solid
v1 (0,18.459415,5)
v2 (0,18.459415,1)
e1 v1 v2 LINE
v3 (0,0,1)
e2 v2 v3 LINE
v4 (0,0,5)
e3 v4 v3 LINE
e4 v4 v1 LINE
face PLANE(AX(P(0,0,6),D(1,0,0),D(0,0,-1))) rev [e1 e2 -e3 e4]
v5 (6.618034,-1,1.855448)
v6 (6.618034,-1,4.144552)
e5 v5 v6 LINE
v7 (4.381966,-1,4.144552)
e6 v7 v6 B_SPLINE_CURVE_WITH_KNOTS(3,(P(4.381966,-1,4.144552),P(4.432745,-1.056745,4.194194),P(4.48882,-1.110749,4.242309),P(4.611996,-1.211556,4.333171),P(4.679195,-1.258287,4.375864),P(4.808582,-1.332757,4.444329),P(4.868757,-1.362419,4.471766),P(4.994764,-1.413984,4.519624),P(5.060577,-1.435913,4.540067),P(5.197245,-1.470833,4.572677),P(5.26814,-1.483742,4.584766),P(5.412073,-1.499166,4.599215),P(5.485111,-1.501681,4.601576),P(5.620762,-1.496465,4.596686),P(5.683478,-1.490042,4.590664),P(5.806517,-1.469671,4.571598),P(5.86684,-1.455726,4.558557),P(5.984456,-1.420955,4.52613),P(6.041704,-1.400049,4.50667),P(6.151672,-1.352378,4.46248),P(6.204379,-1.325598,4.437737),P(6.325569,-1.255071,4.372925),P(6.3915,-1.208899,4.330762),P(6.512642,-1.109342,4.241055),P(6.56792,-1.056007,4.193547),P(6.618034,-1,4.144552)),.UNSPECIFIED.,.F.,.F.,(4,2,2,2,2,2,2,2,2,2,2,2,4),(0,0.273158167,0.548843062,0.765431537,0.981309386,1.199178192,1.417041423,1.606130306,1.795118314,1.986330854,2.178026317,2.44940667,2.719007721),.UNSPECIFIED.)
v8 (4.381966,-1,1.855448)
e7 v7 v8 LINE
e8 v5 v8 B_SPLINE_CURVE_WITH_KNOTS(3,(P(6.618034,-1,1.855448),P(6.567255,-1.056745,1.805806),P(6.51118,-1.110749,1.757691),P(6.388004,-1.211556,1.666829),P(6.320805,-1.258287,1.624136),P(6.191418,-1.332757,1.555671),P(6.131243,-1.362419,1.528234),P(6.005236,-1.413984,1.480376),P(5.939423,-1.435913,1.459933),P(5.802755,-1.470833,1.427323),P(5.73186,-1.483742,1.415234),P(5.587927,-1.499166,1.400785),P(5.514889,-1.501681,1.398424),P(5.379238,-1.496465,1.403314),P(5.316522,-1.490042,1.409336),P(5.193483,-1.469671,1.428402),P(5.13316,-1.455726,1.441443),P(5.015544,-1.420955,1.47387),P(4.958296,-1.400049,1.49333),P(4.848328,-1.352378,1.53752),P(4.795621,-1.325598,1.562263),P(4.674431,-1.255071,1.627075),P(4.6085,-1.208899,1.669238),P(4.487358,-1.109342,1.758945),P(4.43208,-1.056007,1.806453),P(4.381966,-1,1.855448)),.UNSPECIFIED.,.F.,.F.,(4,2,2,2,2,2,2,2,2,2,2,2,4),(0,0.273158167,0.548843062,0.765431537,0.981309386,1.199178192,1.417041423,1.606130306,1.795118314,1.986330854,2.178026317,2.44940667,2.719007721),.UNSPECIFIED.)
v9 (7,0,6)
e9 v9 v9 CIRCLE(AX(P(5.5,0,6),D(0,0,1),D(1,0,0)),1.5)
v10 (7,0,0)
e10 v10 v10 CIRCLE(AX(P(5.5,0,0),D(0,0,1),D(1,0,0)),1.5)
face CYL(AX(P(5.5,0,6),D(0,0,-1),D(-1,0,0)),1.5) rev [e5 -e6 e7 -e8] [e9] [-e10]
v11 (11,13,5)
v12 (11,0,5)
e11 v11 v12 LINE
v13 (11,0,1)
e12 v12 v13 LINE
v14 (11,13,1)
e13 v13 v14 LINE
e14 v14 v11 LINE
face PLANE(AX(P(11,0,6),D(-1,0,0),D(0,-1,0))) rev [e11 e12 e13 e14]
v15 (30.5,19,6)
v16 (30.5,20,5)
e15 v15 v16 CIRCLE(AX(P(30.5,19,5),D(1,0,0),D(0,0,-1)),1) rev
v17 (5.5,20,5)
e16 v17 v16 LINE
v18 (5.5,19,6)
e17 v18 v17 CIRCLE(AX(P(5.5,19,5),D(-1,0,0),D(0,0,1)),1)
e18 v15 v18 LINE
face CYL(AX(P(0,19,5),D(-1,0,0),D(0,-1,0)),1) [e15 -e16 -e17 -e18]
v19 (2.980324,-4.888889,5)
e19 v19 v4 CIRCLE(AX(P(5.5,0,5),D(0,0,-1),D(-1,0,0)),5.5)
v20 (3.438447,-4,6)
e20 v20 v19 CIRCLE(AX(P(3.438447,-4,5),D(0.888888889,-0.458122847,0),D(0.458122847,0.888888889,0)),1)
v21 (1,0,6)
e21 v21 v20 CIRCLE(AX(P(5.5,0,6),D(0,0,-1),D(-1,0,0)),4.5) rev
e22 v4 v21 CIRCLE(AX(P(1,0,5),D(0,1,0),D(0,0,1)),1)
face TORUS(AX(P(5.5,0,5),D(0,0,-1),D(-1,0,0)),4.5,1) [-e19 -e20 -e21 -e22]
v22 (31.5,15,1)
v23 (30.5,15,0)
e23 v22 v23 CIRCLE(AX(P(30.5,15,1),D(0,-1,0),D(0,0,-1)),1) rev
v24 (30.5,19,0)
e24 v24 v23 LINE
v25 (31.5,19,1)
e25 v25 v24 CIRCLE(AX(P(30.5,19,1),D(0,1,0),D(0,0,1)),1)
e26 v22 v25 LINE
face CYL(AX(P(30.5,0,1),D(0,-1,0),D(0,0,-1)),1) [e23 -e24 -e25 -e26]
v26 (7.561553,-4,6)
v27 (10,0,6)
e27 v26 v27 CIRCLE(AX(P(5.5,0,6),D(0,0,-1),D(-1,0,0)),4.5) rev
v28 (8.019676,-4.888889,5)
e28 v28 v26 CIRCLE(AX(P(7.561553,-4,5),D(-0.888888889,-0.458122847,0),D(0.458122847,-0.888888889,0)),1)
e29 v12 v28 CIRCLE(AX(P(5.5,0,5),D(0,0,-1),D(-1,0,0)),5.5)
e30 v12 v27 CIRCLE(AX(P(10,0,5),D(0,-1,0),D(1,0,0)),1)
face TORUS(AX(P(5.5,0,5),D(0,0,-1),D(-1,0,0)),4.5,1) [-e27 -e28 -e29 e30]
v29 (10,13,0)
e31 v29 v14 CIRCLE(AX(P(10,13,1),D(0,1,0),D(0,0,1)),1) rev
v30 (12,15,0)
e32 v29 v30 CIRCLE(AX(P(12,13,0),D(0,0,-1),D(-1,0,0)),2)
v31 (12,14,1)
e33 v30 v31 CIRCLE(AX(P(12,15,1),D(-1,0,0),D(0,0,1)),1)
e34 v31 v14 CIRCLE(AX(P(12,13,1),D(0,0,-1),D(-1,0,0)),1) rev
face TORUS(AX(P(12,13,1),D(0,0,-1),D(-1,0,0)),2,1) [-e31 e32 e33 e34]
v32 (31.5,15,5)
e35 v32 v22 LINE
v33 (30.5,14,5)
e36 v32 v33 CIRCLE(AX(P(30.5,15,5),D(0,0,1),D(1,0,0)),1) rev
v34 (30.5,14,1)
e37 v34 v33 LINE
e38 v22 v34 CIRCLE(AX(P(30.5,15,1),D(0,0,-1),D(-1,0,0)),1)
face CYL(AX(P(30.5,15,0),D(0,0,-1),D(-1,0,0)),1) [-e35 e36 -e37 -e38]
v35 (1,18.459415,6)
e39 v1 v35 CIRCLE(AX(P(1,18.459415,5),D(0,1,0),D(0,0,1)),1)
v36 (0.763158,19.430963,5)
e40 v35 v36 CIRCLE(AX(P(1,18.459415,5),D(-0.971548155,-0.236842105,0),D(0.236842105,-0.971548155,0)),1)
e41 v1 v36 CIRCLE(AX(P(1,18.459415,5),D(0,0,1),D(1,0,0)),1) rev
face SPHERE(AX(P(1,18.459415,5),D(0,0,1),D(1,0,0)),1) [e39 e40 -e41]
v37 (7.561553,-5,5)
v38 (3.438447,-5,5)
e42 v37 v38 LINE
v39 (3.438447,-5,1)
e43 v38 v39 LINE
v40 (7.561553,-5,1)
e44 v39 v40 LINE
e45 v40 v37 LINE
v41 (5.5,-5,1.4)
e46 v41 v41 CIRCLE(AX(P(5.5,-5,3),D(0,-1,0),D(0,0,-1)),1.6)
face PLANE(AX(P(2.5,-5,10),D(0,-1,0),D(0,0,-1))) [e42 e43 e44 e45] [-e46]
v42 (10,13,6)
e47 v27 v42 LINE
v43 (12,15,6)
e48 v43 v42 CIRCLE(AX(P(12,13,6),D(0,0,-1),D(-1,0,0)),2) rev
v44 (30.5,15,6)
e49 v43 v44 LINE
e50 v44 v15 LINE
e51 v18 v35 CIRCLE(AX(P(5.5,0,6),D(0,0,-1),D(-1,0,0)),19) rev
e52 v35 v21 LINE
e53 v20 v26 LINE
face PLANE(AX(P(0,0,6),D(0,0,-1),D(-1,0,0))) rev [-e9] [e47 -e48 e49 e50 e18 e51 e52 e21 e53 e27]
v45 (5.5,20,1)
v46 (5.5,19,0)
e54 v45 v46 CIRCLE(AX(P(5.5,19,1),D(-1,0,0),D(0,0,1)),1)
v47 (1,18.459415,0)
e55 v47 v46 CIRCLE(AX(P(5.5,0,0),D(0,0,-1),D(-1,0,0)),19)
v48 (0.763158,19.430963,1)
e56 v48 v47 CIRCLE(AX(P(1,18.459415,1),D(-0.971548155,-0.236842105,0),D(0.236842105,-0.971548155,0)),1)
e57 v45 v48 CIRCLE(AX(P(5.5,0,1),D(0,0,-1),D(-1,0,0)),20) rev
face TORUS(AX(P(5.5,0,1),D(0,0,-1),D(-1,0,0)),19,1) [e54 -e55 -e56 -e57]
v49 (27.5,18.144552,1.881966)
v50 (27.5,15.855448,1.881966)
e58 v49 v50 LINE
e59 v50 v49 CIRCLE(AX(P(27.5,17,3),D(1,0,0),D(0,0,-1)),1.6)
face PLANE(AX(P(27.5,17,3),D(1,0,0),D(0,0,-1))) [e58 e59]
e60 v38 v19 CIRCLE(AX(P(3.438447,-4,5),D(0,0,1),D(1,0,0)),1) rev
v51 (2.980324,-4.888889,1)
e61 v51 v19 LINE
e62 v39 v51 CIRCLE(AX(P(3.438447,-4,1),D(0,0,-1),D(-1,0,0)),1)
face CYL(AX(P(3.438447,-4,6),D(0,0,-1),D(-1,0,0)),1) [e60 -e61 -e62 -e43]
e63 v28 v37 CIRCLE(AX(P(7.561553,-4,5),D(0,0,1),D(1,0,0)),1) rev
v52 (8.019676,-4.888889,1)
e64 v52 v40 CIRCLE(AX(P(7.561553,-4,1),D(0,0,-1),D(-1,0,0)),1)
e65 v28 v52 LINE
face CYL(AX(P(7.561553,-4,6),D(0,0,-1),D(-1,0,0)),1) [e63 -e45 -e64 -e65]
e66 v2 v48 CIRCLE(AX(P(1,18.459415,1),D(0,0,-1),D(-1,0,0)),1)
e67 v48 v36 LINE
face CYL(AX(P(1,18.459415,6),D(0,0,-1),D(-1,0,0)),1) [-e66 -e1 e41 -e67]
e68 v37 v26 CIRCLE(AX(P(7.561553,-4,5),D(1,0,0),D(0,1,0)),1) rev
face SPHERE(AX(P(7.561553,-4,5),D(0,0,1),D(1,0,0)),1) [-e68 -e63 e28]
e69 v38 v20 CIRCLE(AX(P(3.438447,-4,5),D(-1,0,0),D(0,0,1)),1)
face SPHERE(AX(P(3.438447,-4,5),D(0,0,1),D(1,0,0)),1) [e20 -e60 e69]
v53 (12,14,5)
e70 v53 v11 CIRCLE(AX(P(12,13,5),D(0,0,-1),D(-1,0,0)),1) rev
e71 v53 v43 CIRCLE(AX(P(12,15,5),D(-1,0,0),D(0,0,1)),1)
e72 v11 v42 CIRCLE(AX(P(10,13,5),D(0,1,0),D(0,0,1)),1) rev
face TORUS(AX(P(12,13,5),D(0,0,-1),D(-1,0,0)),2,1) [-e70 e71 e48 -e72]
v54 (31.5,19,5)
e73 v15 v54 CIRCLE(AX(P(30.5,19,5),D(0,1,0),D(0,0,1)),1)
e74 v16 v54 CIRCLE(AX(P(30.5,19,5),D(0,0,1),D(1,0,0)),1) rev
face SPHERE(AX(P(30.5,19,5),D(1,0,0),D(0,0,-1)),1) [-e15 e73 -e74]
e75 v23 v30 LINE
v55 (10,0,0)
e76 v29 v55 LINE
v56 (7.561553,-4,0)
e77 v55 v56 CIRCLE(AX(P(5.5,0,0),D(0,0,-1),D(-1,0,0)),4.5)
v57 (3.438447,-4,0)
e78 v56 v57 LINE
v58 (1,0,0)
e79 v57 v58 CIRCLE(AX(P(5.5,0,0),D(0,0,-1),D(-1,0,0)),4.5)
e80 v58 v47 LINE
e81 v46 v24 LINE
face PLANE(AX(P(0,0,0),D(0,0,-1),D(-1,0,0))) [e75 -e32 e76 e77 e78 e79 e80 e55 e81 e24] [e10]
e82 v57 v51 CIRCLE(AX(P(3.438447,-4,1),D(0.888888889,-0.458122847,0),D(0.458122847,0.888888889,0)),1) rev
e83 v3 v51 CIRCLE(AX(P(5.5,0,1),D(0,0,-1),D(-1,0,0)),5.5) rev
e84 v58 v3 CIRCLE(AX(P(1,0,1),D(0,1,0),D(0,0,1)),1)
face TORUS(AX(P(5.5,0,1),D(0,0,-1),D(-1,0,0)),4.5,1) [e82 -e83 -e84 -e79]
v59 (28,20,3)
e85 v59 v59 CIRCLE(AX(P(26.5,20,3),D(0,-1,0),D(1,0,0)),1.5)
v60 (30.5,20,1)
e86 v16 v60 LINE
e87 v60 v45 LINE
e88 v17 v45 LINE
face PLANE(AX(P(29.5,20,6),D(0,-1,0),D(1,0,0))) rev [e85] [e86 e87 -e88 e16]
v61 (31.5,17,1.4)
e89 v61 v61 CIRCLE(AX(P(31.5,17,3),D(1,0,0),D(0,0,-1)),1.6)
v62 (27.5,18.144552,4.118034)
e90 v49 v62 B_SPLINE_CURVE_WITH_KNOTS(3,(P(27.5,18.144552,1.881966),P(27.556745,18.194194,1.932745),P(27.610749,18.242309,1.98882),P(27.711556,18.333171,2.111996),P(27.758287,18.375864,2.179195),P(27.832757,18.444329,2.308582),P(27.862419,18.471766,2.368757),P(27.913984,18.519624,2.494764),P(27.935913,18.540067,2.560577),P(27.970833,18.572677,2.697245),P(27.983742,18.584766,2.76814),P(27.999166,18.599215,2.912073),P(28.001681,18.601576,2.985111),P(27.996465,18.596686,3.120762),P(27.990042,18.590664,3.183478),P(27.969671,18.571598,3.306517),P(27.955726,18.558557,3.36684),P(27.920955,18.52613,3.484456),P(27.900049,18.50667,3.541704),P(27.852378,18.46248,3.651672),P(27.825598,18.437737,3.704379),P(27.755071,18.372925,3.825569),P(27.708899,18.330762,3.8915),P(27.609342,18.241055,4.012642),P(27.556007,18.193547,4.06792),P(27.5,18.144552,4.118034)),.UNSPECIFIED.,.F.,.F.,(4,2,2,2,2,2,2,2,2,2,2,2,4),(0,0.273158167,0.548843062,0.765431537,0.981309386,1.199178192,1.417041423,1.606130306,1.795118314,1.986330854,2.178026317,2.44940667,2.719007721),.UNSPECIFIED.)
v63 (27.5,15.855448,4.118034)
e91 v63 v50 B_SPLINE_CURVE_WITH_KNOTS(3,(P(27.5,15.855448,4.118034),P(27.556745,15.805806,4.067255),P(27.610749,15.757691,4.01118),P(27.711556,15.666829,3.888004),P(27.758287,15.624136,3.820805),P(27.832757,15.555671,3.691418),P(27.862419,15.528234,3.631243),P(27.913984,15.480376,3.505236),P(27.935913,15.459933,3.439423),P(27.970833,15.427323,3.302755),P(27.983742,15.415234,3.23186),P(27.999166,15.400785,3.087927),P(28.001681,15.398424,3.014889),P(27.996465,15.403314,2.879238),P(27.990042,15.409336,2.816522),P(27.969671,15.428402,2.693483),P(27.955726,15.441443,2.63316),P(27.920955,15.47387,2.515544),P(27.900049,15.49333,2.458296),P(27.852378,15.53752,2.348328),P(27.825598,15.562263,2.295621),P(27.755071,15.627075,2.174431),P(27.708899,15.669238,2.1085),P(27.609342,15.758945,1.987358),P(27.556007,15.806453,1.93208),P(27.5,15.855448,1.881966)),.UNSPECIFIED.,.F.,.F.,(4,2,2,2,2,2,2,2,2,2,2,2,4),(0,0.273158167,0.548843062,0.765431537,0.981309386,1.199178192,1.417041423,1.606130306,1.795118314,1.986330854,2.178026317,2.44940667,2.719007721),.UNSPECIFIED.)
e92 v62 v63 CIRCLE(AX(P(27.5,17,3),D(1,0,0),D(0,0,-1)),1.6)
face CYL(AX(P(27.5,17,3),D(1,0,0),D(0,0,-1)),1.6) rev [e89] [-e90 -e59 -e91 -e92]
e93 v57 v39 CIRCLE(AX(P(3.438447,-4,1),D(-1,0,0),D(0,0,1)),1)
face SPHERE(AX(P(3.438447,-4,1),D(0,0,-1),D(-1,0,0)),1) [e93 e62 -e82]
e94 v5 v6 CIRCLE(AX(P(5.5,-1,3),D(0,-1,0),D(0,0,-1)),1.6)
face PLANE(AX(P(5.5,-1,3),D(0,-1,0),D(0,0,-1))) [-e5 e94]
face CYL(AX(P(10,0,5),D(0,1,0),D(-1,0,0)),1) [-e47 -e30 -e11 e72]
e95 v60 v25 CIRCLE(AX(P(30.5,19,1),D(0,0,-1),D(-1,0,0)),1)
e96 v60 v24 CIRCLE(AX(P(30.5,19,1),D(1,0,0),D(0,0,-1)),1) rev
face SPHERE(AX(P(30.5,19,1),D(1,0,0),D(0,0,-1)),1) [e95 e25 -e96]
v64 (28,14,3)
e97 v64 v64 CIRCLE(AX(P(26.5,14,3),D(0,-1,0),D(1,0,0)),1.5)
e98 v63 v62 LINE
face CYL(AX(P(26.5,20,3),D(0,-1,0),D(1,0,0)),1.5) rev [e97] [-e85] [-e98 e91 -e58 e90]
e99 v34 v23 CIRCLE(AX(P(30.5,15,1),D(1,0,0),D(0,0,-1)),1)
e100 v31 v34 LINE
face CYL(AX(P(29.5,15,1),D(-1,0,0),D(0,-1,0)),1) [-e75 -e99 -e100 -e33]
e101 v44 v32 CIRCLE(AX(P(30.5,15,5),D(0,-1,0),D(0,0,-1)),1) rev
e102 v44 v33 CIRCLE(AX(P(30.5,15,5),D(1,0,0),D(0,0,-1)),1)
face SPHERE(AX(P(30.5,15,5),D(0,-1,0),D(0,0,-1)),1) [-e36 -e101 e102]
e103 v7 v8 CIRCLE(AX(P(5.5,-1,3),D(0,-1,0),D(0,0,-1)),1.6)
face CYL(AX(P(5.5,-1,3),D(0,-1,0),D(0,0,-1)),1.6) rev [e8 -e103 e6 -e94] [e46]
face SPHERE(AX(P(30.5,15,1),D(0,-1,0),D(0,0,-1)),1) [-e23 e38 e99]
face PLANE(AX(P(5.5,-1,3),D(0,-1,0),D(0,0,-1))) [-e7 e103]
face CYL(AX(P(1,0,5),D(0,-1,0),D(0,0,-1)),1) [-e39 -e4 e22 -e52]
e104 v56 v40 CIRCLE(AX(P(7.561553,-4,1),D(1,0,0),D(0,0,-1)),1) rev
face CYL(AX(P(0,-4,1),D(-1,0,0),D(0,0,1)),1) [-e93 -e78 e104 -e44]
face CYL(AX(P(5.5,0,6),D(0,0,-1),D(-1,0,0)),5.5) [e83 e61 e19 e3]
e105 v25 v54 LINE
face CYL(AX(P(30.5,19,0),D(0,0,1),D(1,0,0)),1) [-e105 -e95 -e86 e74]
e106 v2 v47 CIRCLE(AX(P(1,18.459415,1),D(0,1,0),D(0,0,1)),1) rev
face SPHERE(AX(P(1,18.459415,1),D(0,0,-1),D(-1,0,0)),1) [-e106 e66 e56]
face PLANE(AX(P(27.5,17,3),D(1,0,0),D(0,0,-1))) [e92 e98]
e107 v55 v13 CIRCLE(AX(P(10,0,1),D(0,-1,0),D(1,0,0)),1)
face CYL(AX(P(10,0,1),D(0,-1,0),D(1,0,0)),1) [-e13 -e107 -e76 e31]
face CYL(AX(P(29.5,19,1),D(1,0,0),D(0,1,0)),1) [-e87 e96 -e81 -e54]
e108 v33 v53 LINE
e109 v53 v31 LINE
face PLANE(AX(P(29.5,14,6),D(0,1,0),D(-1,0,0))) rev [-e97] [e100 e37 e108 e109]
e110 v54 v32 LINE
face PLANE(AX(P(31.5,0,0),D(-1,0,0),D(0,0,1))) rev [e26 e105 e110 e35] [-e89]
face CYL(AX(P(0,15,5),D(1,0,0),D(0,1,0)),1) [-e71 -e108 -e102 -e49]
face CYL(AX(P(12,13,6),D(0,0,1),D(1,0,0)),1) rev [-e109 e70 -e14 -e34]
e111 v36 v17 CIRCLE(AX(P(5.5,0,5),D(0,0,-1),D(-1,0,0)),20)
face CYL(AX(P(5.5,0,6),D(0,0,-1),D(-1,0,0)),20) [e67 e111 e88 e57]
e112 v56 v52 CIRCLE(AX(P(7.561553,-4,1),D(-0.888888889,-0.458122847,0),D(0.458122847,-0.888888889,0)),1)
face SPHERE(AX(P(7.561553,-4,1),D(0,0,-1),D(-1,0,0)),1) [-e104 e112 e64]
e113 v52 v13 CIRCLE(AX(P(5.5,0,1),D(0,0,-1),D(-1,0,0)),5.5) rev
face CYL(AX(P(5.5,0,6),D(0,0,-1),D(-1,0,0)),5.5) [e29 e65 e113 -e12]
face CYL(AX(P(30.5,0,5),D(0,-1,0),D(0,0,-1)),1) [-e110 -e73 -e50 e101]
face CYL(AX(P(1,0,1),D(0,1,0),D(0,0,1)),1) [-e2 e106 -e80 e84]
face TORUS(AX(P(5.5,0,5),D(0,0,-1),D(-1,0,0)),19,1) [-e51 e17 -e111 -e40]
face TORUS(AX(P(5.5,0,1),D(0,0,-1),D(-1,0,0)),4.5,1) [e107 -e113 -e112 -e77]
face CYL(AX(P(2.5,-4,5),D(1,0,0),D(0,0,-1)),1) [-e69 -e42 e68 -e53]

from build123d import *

# Parameters (mm, degrees)
SKETCH_1_W          = 11
SKETCH_1_H          = 20
EXTRUDE_1_DEPTH     = 6
CUT_EXTRUDE_1_DEPTH = 6
SKETCH_3_R          = 5.5
EXTRUDE_2_DEPTH     = 6
SKETCH_4_W          = 24
SKETCH_4_H          = 6
EXTRUDE_3_DEPTH     = 6
SKETCH_6_R          = 1.5
CUT_EXTRUDE_3_DEPTH = 6
SKETCH_7_R          = 1.5
CUT_EXTRUDE_4_DEPTH = 6
SKETCH_5_W          = 6
SKETCH_5_H          = 0.5
CUT_EXTRUDE_5_DEPTH = 10
SKETCH_15_W         = 6
SKETCH_15_H         = 6
EXTRUDE_4_DEPTH     = 2
FILLET_2_R          = 1
SKETCH_16_R         = 1.6
CUT_EXTRUDE_7_DEPTH = 4
SKETCH_14_R         = 1.6
CUT_EXTRUDE_8_DEPTH = 4


# Read off the part's stored shape, not the designer's step: 切除-拉伸1
with BuildPart() as part:
    # 草图1 → 凸台-拉伸1 (new body)
    with BuildSketch(Plane.XY):
        with Locations((5.5, 10)):
            Rectangle(SKETCH_1_W, SKETCH_1_H)
    extrude(amount=EXTRUDE_1_DEPTH)

    # 切除-拉伸1 outline → 切除-拉伸1 (cut)
    with BuildSketch(Plane.XY):
        with BuildLine():
            Line((0, 20), (0, 19.228884523))
            ThreePointArc((0, 19.228884523), (2.723103392, 19.806282974), (5.5, 20))
            Line((5.5, 20), (0, 20))
        make_face()
        with BuildLine():
            Line((11, 20), (5.5, 20))
            ThreePointArc((5.5, 20), (8.276896608, 19.806282974), (11, 19.228884523))
            Line((11, 19.228884523), (11, 20))
        make_face()
    extrude(amount=CUT_EXTRUDE_1_DEPTH, mode=Mode.SUBTRACT)

    # 草图3 → 凸台-拉伸2 (add)
    with BuildSketch(Plane.XY):
        with Locations((5.5, 0)):
            Circle(SKETCH_3_R)
    extrude(amount=EXTRUDE_2_DEPTH)

    # 草图4 → 凸台-拉伸3 (add)
    with BuildSketch(Plane.XY):
        with Locations((17.5, 17)):
            Rectangle(SKETCH_4_W, SKETCH_4_H)
    extrude(amount=EXTRUDE_3_DEPTH)

    # 草图6 → 切除-拉伸3 (cut)
    with BuildSketch(Plane.XY):
        with Locations((5.5, 0)):
            Circle(SKETCH_6_R)
    extrude(amount=CUT_EXTRUDE_3_DEPTH, mode=Mode.SUBTRACT)

    # 草图7 → 切除-拉伸4 (cut)
    with BuildSketch(Plane.XZ.offset(-14)):
        with Locations((26.5, 3)):
            Circle(SKETCH_7_R)
    extrude(amount=-CUT_EXTRUDE_4_DEPTH, mode=Mode.SUBTRACT)

    # 草图5 → 切除-拉伸5 (cut)
    with BuildSketch(Plane.XY):
        with Locations((5.5, -5.25)):
            Rectangle(SKETCH_5_W, SKETCH_5_H)
    extrude(amount=CUT_EXTRUDE_5_DEPTH, mode=Mode.SUBTRACT)

    # 草图15 → 凸台-拉伸4 (add)
    with BuildSketch(Plane(origin=(29.5, 0, 0), x_dir=(0, 0, -1), z_dir=(1, 0, 0))):
        with Locations((-3, 17)):
            Rectangle(SKETCH_15_W, SKETCH_15_H)
    extrude(amount=EXTRUDE_4_DEPTH)

    # 圆角2
    fillet_2_edges = [part.edges().sort_by_distance(p)[0] for p in [
        (31.5, 17, 0),
        (31.5, 20, 3),
        (31.5, 17, 6),
        (31.5, 14, 3),
        (11, 7, 6),
        (0, 9.614442262, 0),
        (0, 9.614442262, 6),
        (0, 19.228884523, 3),
        (0.871172764, -2.970514841, 0),
        (0.871172764, -2.970514841, 6),
        (2.723103392, 19.806282974, 6),
        (2.723103392, 19.806282974, 0),
        (11, 14, 3),
        (11, 7, 0),
        (21.25, 14, 0),
        (21.25, 14, 6),
        (18.5, 20, 6),
        (18.5, 20, 0),
        (10.128827236, -2.970514841, 6),
        (10.128827236, -2.970514841, 0),
        (7.791287847, -5, 3),
        (3.208712153, -5, 3),
        (5.5, -5, 0),
        (5.5, -5, 6),
    ]]
    fillet(fillet_2_edges, radius=FILLET_2_R)

    # 草图16 → 切除-拉伸7 (cut)
    with BuildSketch(Plane(origin=(31.5, 0, 0), x_dir=(0, 0, -1), z_dir=(1, 0, 0))):
        with Locations((-3, 17)):
            Circle(SKETCH_16_R)
    extrude(amount=-CUT_EXTRUDE_7_DEPTH, mode=Mode.SUBTRACT)

    # 草图14 → 切除-拉伸8 (cut)
    with BuildSketch(Plane(origin=(0, -5, 0), x_dir=(-1, 0, 0), z_dir=(0, -1, 0))):
        with Locations(Location((-5.5, -3, 0), (0, 0, 90))):
            Circle(SKETCH_14_R)
    extrude(amount=-CUT_EXTRUDE_8_DEPTH, mode=Mode.SUBTRACT)


solid = part.part
